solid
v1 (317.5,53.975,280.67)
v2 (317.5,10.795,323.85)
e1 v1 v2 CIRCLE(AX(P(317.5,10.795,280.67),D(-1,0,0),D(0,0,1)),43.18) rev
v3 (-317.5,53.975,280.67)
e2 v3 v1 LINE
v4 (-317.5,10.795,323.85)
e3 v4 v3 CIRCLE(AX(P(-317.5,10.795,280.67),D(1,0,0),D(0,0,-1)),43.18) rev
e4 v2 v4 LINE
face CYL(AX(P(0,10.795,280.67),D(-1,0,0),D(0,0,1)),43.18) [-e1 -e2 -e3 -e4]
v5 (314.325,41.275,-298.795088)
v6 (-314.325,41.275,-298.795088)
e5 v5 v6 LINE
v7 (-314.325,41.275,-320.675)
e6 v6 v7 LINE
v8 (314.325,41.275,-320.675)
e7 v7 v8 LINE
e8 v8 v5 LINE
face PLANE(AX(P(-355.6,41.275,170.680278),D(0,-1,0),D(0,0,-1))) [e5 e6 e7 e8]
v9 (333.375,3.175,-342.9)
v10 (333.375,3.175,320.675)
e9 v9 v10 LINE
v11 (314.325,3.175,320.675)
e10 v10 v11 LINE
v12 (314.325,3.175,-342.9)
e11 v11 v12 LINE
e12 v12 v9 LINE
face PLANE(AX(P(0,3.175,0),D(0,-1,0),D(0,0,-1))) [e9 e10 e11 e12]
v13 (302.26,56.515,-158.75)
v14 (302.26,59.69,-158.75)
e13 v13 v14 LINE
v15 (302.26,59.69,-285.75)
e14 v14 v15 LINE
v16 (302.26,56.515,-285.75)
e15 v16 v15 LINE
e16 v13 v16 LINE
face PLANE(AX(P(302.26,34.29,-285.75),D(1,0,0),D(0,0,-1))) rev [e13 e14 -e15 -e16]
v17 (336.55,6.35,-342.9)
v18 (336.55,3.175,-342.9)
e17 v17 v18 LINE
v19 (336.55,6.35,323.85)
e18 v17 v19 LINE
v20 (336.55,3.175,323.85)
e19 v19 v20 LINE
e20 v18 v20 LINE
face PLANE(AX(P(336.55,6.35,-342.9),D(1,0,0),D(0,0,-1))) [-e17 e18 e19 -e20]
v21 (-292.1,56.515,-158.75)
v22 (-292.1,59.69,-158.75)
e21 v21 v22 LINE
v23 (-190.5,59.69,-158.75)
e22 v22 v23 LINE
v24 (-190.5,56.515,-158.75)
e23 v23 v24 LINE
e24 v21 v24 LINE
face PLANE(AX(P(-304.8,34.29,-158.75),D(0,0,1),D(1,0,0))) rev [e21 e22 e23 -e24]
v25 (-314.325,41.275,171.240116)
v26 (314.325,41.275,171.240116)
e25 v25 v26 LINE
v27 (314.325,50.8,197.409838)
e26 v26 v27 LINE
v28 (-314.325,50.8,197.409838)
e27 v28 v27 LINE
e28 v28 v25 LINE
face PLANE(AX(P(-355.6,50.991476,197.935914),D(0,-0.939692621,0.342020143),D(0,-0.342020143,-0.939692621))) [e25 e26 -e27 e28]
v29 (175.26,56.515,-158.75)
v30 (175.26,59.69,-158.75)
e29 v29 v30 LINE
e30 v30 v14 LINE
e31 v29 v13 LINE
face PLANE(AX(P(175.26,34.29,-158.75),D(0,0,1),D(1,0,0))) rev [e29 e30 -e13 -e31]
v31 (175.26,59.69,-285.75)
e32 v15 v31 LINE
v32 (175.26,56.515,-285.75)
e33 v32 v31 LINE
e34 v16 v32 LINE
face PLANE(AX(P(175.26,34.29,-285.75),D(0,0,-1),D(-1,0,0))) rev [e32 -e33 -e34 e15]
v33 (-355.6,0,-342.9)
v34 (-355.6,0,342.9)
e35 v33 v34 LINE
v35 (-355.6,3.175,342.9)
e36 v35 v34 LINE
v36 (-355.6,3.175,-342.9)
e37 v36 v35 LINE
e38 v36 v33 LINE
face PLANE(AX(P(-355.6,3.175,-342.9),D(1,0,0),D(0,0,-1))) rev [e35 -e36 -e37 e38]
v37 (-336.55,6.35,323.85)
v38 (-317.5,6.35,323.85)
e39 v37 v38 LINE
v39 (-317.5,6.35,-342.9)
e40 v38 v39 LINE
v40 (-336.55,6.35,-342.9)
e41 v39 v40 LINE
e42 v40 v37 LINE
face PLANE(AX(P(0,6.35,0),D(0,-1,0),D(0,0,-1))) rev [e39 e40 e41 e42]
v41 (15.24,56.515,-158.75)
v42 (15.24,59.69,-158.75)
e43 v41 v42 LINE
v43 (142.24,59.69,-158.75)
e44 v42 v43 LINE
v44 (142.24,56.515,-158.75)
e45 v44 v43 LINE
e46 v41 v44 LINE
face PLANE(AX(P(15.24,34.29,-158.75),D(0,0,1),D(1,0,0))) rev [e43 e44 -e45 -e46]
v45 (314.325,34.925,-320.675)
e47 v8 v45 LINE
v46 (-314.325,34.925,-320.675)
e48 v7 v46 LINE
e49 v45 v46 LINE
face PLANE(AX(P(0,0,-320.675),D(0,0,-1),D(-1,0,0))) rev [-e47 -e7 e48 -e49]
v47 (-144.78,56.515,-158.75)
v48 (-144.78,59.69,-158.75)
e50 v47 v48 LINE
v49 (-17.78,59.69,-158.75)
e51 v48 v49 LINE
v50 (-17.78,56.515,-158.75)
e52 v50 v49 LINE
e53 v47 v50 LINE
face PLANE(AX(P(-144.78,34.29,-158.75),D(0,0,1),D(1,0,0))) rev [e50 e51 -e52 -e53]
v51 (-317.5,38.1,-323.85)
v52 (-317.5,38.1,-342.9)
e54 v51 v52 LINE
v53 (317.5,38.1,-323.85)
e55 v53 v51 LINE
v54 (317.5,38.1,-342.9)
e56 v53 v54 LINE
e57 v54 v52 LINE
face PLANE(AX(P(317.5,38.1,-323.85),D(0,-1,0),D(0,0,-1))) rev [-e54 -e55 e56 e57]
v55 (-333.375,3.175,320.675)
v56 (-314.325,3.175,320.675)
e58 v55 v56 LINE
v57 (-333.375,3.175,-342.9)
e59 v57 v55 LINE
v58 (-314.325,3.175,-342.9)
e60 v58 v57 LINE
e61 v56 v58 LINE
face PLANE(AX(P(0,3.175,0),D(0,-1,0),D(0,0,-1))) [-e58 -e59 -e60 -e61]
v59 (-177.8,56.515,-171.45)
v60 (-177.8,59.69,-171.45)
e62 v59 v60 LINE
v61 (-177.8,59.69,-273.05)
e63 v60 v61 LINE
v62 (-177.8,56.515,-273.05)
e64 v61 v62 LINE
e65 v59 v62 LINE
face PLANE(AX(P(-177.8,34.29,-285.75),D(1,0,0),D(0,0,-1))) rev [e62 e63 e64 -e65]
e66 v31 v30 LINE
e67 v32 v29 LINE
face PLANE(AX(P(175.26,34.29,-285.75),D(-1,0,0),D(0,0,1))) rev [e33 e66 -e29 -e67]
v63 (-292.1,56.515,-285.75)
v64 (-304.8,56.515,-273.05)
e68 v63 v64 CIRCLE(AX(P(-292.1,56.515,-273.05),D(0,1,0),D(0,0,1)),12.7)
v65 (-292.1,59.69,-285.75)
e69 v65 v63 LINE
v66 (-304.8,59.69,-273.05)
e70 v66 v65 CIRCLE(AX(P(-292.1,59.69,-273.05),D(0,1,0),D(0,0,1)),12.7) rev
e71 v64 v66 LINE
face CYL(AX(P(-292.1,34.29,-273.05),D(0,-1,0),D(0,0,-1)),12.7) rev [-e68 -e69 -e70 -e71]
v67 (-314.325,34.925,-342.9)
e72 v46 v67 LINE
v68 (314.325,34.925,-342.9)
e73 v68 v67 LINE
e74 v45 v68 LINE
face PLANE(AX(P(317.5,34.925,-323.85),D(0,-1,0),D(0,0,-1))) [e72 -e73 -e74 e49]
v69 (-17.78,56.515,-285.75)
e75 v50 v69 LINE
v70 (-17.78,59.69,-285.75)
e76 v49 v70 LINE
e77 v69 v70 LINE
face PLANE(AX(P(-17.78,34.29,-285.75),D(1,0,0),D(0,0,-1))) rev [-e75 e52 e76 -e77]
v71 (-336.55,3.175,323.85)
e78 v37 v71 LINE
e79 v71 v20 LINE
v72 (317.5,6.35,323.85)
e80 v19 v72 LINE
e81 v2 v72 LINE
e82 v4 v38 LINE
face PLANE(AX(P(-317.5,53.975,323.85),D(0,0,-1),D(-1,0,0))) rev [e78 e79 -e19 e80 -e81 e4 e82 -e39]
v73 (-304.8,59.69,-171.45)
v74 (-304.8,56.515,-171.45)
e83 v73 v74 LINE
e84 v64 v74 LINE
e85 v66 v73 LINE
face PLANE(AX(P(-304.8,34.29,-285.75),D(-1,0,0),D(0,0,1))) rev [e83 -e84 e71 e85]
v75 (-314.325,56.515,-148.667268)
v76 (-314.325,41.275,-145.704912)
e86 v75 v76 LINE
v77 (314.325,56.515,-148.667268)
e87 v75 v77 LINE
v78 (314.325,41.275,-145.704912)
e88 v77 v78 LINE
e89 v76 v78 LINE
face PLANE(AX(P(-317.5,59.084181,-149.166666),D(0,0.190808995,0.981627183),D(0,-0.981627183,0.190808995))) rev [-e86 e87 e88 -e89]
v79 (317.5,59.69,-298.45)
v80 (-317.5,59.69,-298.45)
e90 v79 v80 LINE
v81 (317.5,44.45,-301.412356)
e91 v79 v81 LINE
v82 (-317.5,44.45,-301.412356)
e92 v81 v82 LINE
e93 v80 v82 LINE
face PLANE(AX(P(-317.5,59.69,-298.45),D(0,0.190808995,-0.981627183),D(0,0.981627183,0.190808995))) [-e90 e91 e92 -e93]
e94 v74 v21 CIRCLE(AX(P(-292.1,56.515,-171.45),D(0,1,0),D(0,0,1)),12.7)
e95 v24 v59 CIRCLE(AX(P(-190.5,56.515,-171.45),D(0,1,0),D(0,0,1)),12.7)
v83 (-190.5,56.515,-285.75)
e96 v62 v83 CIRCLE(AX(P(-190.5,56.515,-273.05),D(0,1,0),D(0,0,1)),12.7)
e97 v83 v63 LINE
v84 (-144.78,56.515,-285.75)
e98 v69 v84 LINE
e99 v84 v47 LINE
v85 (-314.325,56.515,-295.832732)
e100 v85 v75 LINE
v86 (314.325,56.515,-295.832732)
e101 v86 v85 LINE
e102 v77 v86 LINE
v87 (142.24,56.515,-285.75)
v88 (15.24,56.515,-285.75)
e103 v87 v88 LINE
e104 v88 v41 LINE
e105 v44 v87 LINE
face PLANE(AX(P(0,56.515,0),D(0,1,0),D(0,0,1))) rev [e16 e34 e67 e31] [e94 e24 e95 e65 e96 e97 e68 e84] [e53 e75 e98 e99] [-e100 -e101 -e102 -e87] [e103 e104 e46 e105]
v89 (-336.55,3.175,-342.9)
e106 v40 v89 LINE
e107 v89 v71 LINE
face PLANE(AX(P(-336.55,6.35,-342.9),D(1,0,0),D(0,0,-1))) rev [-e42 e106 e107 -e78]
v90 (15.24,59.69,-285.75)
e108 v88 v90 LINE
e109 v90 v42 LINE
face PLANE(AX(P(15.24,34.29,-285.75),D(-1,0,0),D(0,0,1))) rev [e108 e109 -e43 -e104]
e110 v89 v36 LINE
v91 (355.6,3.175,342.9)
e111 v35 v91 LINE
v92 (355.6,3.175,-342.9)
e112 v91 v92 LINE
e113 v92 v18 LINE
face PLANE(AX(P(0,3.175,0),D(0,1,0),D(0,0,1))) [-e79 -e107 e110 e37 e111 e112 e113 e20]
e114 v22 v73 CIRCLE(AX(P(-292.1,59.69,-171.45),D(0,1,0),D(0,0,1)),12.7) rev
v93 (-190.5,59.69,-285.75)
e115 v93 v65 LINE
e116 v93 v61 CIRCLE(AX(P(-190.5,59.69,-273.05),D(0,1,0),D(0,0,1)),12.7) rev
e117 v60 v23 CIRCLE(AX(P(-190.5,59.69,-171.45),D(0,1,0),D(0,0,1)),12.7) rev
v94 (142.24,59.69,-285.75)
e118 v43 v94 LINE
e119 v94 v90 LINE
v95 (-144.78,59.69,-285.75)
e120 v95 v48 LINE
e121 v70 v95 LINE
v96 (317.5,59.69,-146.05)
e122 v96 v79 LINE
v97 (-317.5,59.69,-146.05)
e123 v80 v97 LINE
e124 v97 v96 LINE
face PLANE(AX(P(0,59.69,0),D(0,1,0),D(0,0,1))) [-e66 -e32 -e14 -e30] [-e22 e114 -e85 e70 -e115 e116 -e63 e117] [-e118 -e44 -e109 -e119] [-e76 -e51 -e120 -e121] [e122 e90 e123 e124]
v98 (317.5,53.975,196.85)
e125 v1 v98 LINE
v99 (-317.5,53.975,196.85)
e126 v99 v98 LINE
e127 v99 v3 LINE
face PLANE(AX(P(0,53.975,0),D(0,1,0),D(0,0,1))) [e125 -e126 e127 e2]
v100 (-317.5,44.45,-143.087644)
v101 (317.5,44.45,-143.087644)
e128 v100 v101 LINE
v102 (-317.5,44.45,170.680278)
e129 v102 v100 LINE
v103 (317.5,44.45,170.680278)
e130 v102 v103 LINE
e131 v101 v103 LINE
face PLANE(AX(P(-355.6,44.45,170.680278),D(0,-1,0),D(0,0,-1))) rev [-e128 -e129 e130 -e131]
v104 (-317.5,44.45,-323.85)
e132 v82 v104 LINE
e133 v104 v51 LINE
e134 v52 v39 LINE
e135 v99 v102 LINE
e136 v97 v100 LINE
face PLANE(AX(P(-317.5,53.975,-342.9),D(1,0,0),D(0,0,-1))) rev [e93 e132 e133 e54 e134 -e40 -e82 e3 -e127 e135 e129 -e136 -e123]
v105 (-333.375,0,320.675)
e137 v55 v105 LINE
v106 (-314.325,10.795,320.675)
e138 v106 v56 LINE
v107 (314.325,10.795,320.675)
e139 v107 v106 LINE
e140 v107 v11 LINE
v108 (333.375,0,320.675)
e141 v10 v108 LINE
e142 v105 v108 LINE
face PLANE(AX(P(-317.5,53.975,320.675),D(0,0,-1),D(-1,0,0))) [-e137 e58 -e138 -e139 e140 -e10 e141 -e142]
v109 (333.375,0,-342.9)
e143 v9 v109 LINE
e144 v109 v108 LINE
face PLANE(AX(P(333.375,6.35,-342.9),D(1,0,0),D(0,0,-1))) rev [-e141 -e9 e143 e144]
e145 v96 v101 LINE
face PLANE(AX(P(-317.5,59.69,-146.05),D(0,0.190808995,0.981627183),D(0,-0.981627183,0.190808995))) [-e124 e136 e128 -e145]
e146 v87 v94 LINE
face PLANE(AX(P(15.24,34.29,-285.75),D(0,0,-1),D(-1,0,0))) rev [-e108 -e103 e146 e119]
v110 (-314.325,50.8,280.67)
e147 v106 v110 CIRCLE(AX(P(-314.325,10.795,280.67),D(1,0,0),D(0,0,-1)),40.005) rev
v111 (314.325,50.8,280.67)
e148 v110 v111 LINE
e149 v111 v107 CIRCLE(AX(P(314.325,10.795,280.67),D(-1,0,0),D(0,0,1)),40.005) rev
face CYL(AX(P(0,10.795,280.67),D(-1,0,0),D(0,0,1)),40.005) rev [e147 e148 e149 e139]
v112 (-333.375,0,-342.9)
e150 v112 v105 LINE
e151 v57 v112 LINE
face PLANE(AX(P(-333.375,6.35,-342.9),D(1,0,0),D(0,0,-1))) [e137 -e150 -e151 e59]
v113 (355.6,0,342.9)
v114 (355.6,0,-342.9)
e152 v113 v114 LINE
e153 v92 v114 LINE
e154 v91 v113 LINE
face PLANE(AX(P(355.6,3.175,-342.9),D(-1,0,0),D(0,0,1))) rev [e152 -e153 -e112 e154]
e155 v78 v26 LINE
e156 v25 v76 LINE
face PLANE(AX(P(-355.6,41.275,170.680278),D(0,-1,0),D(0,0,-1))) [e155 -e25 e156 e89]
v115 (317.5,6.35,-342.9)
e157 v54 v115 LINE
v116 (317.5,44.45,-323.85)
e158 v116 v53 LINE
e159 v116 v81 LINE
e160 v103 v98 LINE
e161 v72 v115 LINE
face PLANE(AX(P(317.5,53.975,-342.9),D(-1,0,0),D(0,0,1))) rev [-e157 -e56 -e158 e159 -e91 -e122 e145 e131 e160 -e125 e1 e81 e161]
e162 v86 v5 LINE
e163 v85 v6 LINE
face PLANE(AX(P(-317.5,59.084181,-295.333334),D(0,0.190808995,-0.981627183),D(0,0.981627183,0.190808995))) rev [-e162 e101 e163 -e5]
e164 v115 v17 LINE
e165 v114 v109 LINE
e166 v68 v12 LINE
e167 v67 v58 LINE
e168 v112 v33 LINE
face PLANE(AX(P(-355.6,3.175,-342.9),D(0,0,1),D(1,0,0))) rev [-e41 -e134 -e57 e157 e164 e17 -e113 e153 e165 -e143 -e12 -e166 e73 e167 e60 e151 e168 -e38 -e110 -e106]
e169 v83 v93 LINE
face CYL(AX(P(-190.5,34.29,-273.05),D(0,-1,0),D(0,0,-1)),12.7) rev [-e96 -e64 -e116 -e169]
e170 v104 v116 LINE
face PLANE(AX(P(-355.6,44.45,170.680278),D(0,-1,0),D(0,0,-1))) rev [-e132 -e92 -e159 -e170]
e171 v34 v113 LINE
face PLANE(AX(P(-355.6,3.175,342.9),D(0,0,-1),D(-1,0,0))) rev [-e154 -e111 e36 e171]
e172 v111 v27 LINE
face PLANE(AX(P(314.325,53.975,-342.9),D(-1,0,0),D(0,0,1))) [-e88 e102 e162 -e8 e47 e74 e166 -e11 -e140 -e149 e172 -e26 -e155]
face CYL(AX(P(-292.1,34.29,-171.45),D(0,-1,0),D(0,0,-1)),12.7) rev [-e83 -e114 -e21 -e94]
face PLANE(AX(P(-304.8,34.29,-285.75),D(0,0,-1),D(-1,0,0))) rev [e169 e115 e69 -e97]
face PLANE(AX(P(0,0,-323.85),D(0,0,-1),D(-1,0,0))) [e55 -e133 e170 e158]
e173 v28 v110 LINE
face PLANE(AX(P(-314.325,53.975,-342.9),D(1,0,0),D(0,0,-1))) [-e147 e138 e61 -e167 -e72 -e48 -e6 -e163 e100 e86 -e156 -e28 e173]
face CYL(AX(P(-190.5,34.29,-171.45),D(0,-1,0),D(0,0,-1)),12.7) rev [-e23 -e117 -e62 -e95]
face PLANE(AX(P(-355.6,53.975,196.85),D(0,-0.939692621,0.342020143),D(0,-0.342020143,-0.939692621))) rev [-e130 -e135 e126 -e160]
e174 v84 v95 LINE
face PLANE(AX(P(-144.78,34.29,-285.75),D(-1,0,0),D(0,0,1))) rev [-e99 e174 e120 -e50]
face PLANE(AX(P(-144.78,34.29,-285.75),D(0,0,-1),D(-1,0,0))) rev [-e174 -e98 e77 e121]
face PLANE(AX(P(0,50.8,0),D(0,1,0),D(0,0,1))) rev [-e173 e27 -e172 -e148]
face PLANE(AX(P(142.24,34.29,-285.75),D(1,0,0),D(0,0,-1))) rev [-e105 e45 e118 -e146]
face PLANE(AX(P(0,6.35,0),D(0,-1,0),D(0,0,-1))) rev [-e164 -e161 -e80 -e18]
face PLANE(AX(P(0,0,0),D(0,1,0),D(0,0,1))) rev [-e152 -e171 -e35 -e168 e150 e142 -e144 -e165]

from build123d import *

# Parameters (mm, degrees)
SKETCH1_W               = 711.2
SKETCH1_H               = 685.8
BOSS_EXTRUDE1_DEPTH     = 3.175
SKETCH2_W               = 635
SKETCH2_H               = 666.75
BOSS_EXTRUDE2_DEPTH     = 50.8
CUT_EXTRUDE1_DEPTH      = 497.935680571
CUT_EXTRUDE1_DEPTH_BACK = 497.935680571
SKETCH4_W               = 19.05
SKETCH4_H               = 666.75
BOSS_EXTRUDE3_DEPTH     = 3.175
SKETCH5_W               = 317.5
SKETCH5_H               = 6.35
CUT_EXTRUDE2_DEPTH      = 19.05
FILLET1_R               = 43.18
SKETCH6_W               = 635
SKETCH6_H               = 152.4
BOSS_EXTRUDE4_DEPTH     = 15.24
DRAFT2_ANGLE            = 11
SHELL1_START            = -314.325
SHELL1_DEPTH            = 628.65
SHELL1_START_2          = -333.375
SHELL1_2_OUTLINE_W      = 3.175
SHELL1_2_OUTLINE_H      = 663.575
SHELL1_2_DEPTH          = 666.75
SKETCH7_W               = 127
SKETCH7_H               = 127
CUT_EXTRUDE3_DEPTH      = 25.4
LPATTERN1_COUNT         = 4
LPATTERN1_PITCH         = 160.02
FILLET2_R               = 12.7


# Read off the part's stored shape, not the designer's step: Shell1
with BuildPart() as part:
    # Sketch1 → Boss-Extrude1 (new body)
    with BuildSketch(Plane(origin=(0, 0, 0), x_dir=(1, 0, 0), z_dir=(0, 1, 0))):
        Rectangle(SKETCH1_W, SKETCH1_H)
    extrude(amount=BOSS_EXTRUDE1_DEPTH)

    # Sketch2 → Boss-Extrude2 (add)
    with BuildSketch(Plane(origin=(0, 3.175, 0), x_dir=(1, 0, 0), z_dir=(0, 1, 0))):
        with Locations((0, 9.525)):
            Rectangle(SKETCH2_W, SKETCH2_H)
    extrude(amount=BOSS_EXTRUDE2_DEPTH)

    # Sketch3 → Cut-Extrude1 (cut, two sides: drawn at the far end of the back side and taken through both)
    with BuildSketch(Plane(origin=(0, 0, 0), x_dir=(0, 0, -1), z_dir=(1, 0, 0)).offset(-CUT_EXTRUDE1_DEPTH_BACK)):
        Polygon((-196.85, 53.975), (-170.68027758, 44.45), (342.9, 44.45), (342.9, 53.975), align=None)
    extrude(amount=CUT_EXTRUDE1_DEPTH + CUT_EXTRUDE1_DEPTH_BACK, mode=Mode.SUBTRACT)

    # Sketch4 → Boss-Extrude3 (add)
    with BuildSketch(Plane(origin=(0, 3.175, 0), x_dir=(1, 0, 0), z_dir=(0, 1, 0))):
        with Locations((-327.025, 9.525)):
            Rectangle(SKETCH4_W, SKETCH4_H)
    boss_extrude3 = extrude(amount=BOSS_EXTRUDE3_DEPTH)

    # Mirror1: Boss-Extrude3 across plane
    add(boss_extrude3.mirror(Plane(origin=(0, 0, 0), x_dir=(0, 0, 1), z_dir=(1, 0, 0))))

    # Sketch5 → Cut-Extrude2 (cut)
    with BuildSketch(Plane(origin=(0, 0, -342.9), x_dir=(-1, 0, 0), z_dir=(0, 0, -1))):
        with Locations((-158.75, 41.275)):
            Rectangle(SKETCH5_W, SKETCH5_H)
    cut_extrude2 = extrude(amount=-CUT_EXTRUDE2_DEPTH, mode=Mode.SUBTRACT)

    # Mirror2: Cut-Extrude2 across plane
    add(cut_extrude2.mirror(Plane(origin=(0, 0, 0), x_dir=(0, 0, 1), z_dir=(1, 0, 0))), mode=Mode.SUBTRACT)

    # Fillet1
    fillet1_edges = [part.edges().sort_by_distance(p)[0] for p in [
        (0, 53.975, 323.85),
    ]]
    fillet(fillet1_edges, radius=FILLET1_R)

    # Sketch6 → Boss-Extrude4 (add)
    with BuildSketch(Plane(origin=(0, 44.45, 0), x_dir=(1, 0, 0), z_dir=(0, 1, 0))):
        with Locations((0, 222.25)):
            Rectangle(SKETCH6_W, SKETCH6_H)
    extrude(amount=BOSS_EXTRUDE4_DEPTH)

    # Draft2
    draft2_faces = [part.faces().sort_by_distance(p)[0] for p in [
        (0, 52.07, -146.05),
        (0, 52.07, -298.45),
    ]]
    draft(draft2_faces, Plane.ZX.offset(59.69), DRAFT2_ANGLE)

    # Shell1 outline → Shell1 (cut)
    with BuildSketch(Plane.YZ.offset(SHELL1_START)):
        with BuildLine():
            Line((41.275, -145.704912114), (41.275, 171.240115743))
            Line((41.275, 171.240115743), (50.8, 197.409838164))
            Line((50.8, 197.409838164), (50.8, 280.67))
            ThreePointArc((50.8, 280.67), (39.082806781, 308.957806781), (10.795, 320.675))
            Line((10.795, 320.675), (0, 320.675))
            Line((0, 320.675), (0, -342.9))
            Line((0, -342.9), (34.925, -342.9))
            Line((34.925, -342.9), (34.925, -320.675))
            Line((34.925, -320.675), (41.275, -320.675))
            Line((41.275, -320.675), (41.275, -298.795087886))
            Line((41.275, -298.795087886), (56.515, -295.832731975))
            Line((56.515, -295.832731975), (56.515, -148.667268025))
            Line((56.515, -148.667268025), (41.275, -145.704912114))
        make_face()
    extrude(amount=SHELL1_DEPTH, mode=Mode.SUBTRACT)

    # Shell1 2 outline → Shell1 2 (cut)
    with BuildSketch(Plane.YZ.offset(SHELL1_START_2)):
        with Locations((1.5875, -11.1125)):
            Rectangle(SHELL1_2_OUTLINE_W, SHELL1_2_OUTLINE_H)
    extrude(amount=SHELL1_2_DEPTH, mode=Mode.SUBTRACT)

    # Sketch7 → Cut-Extrude3 (cut)
    with BuildSketch(Plane(origin=(0, 59.69, 0), x_dir=(1, 0, 0), z_dir=(0, 1, 0))):
        with Locations((-241.3, 222.25)):
            Rectangle(SKETCH7_W, SKETCH7_H)
    cut_extrude3 = extrude(amount=-CUT_EXTRUDE3_DEPTH, mode=Mode.SUBTRACT)

    # LPattern1: Cut-Extrude3 ×4
    with Locations(*[(i * LPATTERN1_PITCH, 0, 0) for i in range(1, LPATTERN1_COUNT)]):
        add(cut_extrude3, mode=Mode.SUBTRACT)

    # Fillet2
    fillet2_edges = [part.edges().sort_by_distance(p)[0] for p in [
        (-304.8, 58.1025, -158.75),
        (-304.8, 58.1025, -285.75),
        (-177.8, 58.1025, -285.75),
        (-177.8, 58.1025, -158.75),
    ]]
    fillet(fillet2_edges, radius=FILLET2_R)


solid = part.part
